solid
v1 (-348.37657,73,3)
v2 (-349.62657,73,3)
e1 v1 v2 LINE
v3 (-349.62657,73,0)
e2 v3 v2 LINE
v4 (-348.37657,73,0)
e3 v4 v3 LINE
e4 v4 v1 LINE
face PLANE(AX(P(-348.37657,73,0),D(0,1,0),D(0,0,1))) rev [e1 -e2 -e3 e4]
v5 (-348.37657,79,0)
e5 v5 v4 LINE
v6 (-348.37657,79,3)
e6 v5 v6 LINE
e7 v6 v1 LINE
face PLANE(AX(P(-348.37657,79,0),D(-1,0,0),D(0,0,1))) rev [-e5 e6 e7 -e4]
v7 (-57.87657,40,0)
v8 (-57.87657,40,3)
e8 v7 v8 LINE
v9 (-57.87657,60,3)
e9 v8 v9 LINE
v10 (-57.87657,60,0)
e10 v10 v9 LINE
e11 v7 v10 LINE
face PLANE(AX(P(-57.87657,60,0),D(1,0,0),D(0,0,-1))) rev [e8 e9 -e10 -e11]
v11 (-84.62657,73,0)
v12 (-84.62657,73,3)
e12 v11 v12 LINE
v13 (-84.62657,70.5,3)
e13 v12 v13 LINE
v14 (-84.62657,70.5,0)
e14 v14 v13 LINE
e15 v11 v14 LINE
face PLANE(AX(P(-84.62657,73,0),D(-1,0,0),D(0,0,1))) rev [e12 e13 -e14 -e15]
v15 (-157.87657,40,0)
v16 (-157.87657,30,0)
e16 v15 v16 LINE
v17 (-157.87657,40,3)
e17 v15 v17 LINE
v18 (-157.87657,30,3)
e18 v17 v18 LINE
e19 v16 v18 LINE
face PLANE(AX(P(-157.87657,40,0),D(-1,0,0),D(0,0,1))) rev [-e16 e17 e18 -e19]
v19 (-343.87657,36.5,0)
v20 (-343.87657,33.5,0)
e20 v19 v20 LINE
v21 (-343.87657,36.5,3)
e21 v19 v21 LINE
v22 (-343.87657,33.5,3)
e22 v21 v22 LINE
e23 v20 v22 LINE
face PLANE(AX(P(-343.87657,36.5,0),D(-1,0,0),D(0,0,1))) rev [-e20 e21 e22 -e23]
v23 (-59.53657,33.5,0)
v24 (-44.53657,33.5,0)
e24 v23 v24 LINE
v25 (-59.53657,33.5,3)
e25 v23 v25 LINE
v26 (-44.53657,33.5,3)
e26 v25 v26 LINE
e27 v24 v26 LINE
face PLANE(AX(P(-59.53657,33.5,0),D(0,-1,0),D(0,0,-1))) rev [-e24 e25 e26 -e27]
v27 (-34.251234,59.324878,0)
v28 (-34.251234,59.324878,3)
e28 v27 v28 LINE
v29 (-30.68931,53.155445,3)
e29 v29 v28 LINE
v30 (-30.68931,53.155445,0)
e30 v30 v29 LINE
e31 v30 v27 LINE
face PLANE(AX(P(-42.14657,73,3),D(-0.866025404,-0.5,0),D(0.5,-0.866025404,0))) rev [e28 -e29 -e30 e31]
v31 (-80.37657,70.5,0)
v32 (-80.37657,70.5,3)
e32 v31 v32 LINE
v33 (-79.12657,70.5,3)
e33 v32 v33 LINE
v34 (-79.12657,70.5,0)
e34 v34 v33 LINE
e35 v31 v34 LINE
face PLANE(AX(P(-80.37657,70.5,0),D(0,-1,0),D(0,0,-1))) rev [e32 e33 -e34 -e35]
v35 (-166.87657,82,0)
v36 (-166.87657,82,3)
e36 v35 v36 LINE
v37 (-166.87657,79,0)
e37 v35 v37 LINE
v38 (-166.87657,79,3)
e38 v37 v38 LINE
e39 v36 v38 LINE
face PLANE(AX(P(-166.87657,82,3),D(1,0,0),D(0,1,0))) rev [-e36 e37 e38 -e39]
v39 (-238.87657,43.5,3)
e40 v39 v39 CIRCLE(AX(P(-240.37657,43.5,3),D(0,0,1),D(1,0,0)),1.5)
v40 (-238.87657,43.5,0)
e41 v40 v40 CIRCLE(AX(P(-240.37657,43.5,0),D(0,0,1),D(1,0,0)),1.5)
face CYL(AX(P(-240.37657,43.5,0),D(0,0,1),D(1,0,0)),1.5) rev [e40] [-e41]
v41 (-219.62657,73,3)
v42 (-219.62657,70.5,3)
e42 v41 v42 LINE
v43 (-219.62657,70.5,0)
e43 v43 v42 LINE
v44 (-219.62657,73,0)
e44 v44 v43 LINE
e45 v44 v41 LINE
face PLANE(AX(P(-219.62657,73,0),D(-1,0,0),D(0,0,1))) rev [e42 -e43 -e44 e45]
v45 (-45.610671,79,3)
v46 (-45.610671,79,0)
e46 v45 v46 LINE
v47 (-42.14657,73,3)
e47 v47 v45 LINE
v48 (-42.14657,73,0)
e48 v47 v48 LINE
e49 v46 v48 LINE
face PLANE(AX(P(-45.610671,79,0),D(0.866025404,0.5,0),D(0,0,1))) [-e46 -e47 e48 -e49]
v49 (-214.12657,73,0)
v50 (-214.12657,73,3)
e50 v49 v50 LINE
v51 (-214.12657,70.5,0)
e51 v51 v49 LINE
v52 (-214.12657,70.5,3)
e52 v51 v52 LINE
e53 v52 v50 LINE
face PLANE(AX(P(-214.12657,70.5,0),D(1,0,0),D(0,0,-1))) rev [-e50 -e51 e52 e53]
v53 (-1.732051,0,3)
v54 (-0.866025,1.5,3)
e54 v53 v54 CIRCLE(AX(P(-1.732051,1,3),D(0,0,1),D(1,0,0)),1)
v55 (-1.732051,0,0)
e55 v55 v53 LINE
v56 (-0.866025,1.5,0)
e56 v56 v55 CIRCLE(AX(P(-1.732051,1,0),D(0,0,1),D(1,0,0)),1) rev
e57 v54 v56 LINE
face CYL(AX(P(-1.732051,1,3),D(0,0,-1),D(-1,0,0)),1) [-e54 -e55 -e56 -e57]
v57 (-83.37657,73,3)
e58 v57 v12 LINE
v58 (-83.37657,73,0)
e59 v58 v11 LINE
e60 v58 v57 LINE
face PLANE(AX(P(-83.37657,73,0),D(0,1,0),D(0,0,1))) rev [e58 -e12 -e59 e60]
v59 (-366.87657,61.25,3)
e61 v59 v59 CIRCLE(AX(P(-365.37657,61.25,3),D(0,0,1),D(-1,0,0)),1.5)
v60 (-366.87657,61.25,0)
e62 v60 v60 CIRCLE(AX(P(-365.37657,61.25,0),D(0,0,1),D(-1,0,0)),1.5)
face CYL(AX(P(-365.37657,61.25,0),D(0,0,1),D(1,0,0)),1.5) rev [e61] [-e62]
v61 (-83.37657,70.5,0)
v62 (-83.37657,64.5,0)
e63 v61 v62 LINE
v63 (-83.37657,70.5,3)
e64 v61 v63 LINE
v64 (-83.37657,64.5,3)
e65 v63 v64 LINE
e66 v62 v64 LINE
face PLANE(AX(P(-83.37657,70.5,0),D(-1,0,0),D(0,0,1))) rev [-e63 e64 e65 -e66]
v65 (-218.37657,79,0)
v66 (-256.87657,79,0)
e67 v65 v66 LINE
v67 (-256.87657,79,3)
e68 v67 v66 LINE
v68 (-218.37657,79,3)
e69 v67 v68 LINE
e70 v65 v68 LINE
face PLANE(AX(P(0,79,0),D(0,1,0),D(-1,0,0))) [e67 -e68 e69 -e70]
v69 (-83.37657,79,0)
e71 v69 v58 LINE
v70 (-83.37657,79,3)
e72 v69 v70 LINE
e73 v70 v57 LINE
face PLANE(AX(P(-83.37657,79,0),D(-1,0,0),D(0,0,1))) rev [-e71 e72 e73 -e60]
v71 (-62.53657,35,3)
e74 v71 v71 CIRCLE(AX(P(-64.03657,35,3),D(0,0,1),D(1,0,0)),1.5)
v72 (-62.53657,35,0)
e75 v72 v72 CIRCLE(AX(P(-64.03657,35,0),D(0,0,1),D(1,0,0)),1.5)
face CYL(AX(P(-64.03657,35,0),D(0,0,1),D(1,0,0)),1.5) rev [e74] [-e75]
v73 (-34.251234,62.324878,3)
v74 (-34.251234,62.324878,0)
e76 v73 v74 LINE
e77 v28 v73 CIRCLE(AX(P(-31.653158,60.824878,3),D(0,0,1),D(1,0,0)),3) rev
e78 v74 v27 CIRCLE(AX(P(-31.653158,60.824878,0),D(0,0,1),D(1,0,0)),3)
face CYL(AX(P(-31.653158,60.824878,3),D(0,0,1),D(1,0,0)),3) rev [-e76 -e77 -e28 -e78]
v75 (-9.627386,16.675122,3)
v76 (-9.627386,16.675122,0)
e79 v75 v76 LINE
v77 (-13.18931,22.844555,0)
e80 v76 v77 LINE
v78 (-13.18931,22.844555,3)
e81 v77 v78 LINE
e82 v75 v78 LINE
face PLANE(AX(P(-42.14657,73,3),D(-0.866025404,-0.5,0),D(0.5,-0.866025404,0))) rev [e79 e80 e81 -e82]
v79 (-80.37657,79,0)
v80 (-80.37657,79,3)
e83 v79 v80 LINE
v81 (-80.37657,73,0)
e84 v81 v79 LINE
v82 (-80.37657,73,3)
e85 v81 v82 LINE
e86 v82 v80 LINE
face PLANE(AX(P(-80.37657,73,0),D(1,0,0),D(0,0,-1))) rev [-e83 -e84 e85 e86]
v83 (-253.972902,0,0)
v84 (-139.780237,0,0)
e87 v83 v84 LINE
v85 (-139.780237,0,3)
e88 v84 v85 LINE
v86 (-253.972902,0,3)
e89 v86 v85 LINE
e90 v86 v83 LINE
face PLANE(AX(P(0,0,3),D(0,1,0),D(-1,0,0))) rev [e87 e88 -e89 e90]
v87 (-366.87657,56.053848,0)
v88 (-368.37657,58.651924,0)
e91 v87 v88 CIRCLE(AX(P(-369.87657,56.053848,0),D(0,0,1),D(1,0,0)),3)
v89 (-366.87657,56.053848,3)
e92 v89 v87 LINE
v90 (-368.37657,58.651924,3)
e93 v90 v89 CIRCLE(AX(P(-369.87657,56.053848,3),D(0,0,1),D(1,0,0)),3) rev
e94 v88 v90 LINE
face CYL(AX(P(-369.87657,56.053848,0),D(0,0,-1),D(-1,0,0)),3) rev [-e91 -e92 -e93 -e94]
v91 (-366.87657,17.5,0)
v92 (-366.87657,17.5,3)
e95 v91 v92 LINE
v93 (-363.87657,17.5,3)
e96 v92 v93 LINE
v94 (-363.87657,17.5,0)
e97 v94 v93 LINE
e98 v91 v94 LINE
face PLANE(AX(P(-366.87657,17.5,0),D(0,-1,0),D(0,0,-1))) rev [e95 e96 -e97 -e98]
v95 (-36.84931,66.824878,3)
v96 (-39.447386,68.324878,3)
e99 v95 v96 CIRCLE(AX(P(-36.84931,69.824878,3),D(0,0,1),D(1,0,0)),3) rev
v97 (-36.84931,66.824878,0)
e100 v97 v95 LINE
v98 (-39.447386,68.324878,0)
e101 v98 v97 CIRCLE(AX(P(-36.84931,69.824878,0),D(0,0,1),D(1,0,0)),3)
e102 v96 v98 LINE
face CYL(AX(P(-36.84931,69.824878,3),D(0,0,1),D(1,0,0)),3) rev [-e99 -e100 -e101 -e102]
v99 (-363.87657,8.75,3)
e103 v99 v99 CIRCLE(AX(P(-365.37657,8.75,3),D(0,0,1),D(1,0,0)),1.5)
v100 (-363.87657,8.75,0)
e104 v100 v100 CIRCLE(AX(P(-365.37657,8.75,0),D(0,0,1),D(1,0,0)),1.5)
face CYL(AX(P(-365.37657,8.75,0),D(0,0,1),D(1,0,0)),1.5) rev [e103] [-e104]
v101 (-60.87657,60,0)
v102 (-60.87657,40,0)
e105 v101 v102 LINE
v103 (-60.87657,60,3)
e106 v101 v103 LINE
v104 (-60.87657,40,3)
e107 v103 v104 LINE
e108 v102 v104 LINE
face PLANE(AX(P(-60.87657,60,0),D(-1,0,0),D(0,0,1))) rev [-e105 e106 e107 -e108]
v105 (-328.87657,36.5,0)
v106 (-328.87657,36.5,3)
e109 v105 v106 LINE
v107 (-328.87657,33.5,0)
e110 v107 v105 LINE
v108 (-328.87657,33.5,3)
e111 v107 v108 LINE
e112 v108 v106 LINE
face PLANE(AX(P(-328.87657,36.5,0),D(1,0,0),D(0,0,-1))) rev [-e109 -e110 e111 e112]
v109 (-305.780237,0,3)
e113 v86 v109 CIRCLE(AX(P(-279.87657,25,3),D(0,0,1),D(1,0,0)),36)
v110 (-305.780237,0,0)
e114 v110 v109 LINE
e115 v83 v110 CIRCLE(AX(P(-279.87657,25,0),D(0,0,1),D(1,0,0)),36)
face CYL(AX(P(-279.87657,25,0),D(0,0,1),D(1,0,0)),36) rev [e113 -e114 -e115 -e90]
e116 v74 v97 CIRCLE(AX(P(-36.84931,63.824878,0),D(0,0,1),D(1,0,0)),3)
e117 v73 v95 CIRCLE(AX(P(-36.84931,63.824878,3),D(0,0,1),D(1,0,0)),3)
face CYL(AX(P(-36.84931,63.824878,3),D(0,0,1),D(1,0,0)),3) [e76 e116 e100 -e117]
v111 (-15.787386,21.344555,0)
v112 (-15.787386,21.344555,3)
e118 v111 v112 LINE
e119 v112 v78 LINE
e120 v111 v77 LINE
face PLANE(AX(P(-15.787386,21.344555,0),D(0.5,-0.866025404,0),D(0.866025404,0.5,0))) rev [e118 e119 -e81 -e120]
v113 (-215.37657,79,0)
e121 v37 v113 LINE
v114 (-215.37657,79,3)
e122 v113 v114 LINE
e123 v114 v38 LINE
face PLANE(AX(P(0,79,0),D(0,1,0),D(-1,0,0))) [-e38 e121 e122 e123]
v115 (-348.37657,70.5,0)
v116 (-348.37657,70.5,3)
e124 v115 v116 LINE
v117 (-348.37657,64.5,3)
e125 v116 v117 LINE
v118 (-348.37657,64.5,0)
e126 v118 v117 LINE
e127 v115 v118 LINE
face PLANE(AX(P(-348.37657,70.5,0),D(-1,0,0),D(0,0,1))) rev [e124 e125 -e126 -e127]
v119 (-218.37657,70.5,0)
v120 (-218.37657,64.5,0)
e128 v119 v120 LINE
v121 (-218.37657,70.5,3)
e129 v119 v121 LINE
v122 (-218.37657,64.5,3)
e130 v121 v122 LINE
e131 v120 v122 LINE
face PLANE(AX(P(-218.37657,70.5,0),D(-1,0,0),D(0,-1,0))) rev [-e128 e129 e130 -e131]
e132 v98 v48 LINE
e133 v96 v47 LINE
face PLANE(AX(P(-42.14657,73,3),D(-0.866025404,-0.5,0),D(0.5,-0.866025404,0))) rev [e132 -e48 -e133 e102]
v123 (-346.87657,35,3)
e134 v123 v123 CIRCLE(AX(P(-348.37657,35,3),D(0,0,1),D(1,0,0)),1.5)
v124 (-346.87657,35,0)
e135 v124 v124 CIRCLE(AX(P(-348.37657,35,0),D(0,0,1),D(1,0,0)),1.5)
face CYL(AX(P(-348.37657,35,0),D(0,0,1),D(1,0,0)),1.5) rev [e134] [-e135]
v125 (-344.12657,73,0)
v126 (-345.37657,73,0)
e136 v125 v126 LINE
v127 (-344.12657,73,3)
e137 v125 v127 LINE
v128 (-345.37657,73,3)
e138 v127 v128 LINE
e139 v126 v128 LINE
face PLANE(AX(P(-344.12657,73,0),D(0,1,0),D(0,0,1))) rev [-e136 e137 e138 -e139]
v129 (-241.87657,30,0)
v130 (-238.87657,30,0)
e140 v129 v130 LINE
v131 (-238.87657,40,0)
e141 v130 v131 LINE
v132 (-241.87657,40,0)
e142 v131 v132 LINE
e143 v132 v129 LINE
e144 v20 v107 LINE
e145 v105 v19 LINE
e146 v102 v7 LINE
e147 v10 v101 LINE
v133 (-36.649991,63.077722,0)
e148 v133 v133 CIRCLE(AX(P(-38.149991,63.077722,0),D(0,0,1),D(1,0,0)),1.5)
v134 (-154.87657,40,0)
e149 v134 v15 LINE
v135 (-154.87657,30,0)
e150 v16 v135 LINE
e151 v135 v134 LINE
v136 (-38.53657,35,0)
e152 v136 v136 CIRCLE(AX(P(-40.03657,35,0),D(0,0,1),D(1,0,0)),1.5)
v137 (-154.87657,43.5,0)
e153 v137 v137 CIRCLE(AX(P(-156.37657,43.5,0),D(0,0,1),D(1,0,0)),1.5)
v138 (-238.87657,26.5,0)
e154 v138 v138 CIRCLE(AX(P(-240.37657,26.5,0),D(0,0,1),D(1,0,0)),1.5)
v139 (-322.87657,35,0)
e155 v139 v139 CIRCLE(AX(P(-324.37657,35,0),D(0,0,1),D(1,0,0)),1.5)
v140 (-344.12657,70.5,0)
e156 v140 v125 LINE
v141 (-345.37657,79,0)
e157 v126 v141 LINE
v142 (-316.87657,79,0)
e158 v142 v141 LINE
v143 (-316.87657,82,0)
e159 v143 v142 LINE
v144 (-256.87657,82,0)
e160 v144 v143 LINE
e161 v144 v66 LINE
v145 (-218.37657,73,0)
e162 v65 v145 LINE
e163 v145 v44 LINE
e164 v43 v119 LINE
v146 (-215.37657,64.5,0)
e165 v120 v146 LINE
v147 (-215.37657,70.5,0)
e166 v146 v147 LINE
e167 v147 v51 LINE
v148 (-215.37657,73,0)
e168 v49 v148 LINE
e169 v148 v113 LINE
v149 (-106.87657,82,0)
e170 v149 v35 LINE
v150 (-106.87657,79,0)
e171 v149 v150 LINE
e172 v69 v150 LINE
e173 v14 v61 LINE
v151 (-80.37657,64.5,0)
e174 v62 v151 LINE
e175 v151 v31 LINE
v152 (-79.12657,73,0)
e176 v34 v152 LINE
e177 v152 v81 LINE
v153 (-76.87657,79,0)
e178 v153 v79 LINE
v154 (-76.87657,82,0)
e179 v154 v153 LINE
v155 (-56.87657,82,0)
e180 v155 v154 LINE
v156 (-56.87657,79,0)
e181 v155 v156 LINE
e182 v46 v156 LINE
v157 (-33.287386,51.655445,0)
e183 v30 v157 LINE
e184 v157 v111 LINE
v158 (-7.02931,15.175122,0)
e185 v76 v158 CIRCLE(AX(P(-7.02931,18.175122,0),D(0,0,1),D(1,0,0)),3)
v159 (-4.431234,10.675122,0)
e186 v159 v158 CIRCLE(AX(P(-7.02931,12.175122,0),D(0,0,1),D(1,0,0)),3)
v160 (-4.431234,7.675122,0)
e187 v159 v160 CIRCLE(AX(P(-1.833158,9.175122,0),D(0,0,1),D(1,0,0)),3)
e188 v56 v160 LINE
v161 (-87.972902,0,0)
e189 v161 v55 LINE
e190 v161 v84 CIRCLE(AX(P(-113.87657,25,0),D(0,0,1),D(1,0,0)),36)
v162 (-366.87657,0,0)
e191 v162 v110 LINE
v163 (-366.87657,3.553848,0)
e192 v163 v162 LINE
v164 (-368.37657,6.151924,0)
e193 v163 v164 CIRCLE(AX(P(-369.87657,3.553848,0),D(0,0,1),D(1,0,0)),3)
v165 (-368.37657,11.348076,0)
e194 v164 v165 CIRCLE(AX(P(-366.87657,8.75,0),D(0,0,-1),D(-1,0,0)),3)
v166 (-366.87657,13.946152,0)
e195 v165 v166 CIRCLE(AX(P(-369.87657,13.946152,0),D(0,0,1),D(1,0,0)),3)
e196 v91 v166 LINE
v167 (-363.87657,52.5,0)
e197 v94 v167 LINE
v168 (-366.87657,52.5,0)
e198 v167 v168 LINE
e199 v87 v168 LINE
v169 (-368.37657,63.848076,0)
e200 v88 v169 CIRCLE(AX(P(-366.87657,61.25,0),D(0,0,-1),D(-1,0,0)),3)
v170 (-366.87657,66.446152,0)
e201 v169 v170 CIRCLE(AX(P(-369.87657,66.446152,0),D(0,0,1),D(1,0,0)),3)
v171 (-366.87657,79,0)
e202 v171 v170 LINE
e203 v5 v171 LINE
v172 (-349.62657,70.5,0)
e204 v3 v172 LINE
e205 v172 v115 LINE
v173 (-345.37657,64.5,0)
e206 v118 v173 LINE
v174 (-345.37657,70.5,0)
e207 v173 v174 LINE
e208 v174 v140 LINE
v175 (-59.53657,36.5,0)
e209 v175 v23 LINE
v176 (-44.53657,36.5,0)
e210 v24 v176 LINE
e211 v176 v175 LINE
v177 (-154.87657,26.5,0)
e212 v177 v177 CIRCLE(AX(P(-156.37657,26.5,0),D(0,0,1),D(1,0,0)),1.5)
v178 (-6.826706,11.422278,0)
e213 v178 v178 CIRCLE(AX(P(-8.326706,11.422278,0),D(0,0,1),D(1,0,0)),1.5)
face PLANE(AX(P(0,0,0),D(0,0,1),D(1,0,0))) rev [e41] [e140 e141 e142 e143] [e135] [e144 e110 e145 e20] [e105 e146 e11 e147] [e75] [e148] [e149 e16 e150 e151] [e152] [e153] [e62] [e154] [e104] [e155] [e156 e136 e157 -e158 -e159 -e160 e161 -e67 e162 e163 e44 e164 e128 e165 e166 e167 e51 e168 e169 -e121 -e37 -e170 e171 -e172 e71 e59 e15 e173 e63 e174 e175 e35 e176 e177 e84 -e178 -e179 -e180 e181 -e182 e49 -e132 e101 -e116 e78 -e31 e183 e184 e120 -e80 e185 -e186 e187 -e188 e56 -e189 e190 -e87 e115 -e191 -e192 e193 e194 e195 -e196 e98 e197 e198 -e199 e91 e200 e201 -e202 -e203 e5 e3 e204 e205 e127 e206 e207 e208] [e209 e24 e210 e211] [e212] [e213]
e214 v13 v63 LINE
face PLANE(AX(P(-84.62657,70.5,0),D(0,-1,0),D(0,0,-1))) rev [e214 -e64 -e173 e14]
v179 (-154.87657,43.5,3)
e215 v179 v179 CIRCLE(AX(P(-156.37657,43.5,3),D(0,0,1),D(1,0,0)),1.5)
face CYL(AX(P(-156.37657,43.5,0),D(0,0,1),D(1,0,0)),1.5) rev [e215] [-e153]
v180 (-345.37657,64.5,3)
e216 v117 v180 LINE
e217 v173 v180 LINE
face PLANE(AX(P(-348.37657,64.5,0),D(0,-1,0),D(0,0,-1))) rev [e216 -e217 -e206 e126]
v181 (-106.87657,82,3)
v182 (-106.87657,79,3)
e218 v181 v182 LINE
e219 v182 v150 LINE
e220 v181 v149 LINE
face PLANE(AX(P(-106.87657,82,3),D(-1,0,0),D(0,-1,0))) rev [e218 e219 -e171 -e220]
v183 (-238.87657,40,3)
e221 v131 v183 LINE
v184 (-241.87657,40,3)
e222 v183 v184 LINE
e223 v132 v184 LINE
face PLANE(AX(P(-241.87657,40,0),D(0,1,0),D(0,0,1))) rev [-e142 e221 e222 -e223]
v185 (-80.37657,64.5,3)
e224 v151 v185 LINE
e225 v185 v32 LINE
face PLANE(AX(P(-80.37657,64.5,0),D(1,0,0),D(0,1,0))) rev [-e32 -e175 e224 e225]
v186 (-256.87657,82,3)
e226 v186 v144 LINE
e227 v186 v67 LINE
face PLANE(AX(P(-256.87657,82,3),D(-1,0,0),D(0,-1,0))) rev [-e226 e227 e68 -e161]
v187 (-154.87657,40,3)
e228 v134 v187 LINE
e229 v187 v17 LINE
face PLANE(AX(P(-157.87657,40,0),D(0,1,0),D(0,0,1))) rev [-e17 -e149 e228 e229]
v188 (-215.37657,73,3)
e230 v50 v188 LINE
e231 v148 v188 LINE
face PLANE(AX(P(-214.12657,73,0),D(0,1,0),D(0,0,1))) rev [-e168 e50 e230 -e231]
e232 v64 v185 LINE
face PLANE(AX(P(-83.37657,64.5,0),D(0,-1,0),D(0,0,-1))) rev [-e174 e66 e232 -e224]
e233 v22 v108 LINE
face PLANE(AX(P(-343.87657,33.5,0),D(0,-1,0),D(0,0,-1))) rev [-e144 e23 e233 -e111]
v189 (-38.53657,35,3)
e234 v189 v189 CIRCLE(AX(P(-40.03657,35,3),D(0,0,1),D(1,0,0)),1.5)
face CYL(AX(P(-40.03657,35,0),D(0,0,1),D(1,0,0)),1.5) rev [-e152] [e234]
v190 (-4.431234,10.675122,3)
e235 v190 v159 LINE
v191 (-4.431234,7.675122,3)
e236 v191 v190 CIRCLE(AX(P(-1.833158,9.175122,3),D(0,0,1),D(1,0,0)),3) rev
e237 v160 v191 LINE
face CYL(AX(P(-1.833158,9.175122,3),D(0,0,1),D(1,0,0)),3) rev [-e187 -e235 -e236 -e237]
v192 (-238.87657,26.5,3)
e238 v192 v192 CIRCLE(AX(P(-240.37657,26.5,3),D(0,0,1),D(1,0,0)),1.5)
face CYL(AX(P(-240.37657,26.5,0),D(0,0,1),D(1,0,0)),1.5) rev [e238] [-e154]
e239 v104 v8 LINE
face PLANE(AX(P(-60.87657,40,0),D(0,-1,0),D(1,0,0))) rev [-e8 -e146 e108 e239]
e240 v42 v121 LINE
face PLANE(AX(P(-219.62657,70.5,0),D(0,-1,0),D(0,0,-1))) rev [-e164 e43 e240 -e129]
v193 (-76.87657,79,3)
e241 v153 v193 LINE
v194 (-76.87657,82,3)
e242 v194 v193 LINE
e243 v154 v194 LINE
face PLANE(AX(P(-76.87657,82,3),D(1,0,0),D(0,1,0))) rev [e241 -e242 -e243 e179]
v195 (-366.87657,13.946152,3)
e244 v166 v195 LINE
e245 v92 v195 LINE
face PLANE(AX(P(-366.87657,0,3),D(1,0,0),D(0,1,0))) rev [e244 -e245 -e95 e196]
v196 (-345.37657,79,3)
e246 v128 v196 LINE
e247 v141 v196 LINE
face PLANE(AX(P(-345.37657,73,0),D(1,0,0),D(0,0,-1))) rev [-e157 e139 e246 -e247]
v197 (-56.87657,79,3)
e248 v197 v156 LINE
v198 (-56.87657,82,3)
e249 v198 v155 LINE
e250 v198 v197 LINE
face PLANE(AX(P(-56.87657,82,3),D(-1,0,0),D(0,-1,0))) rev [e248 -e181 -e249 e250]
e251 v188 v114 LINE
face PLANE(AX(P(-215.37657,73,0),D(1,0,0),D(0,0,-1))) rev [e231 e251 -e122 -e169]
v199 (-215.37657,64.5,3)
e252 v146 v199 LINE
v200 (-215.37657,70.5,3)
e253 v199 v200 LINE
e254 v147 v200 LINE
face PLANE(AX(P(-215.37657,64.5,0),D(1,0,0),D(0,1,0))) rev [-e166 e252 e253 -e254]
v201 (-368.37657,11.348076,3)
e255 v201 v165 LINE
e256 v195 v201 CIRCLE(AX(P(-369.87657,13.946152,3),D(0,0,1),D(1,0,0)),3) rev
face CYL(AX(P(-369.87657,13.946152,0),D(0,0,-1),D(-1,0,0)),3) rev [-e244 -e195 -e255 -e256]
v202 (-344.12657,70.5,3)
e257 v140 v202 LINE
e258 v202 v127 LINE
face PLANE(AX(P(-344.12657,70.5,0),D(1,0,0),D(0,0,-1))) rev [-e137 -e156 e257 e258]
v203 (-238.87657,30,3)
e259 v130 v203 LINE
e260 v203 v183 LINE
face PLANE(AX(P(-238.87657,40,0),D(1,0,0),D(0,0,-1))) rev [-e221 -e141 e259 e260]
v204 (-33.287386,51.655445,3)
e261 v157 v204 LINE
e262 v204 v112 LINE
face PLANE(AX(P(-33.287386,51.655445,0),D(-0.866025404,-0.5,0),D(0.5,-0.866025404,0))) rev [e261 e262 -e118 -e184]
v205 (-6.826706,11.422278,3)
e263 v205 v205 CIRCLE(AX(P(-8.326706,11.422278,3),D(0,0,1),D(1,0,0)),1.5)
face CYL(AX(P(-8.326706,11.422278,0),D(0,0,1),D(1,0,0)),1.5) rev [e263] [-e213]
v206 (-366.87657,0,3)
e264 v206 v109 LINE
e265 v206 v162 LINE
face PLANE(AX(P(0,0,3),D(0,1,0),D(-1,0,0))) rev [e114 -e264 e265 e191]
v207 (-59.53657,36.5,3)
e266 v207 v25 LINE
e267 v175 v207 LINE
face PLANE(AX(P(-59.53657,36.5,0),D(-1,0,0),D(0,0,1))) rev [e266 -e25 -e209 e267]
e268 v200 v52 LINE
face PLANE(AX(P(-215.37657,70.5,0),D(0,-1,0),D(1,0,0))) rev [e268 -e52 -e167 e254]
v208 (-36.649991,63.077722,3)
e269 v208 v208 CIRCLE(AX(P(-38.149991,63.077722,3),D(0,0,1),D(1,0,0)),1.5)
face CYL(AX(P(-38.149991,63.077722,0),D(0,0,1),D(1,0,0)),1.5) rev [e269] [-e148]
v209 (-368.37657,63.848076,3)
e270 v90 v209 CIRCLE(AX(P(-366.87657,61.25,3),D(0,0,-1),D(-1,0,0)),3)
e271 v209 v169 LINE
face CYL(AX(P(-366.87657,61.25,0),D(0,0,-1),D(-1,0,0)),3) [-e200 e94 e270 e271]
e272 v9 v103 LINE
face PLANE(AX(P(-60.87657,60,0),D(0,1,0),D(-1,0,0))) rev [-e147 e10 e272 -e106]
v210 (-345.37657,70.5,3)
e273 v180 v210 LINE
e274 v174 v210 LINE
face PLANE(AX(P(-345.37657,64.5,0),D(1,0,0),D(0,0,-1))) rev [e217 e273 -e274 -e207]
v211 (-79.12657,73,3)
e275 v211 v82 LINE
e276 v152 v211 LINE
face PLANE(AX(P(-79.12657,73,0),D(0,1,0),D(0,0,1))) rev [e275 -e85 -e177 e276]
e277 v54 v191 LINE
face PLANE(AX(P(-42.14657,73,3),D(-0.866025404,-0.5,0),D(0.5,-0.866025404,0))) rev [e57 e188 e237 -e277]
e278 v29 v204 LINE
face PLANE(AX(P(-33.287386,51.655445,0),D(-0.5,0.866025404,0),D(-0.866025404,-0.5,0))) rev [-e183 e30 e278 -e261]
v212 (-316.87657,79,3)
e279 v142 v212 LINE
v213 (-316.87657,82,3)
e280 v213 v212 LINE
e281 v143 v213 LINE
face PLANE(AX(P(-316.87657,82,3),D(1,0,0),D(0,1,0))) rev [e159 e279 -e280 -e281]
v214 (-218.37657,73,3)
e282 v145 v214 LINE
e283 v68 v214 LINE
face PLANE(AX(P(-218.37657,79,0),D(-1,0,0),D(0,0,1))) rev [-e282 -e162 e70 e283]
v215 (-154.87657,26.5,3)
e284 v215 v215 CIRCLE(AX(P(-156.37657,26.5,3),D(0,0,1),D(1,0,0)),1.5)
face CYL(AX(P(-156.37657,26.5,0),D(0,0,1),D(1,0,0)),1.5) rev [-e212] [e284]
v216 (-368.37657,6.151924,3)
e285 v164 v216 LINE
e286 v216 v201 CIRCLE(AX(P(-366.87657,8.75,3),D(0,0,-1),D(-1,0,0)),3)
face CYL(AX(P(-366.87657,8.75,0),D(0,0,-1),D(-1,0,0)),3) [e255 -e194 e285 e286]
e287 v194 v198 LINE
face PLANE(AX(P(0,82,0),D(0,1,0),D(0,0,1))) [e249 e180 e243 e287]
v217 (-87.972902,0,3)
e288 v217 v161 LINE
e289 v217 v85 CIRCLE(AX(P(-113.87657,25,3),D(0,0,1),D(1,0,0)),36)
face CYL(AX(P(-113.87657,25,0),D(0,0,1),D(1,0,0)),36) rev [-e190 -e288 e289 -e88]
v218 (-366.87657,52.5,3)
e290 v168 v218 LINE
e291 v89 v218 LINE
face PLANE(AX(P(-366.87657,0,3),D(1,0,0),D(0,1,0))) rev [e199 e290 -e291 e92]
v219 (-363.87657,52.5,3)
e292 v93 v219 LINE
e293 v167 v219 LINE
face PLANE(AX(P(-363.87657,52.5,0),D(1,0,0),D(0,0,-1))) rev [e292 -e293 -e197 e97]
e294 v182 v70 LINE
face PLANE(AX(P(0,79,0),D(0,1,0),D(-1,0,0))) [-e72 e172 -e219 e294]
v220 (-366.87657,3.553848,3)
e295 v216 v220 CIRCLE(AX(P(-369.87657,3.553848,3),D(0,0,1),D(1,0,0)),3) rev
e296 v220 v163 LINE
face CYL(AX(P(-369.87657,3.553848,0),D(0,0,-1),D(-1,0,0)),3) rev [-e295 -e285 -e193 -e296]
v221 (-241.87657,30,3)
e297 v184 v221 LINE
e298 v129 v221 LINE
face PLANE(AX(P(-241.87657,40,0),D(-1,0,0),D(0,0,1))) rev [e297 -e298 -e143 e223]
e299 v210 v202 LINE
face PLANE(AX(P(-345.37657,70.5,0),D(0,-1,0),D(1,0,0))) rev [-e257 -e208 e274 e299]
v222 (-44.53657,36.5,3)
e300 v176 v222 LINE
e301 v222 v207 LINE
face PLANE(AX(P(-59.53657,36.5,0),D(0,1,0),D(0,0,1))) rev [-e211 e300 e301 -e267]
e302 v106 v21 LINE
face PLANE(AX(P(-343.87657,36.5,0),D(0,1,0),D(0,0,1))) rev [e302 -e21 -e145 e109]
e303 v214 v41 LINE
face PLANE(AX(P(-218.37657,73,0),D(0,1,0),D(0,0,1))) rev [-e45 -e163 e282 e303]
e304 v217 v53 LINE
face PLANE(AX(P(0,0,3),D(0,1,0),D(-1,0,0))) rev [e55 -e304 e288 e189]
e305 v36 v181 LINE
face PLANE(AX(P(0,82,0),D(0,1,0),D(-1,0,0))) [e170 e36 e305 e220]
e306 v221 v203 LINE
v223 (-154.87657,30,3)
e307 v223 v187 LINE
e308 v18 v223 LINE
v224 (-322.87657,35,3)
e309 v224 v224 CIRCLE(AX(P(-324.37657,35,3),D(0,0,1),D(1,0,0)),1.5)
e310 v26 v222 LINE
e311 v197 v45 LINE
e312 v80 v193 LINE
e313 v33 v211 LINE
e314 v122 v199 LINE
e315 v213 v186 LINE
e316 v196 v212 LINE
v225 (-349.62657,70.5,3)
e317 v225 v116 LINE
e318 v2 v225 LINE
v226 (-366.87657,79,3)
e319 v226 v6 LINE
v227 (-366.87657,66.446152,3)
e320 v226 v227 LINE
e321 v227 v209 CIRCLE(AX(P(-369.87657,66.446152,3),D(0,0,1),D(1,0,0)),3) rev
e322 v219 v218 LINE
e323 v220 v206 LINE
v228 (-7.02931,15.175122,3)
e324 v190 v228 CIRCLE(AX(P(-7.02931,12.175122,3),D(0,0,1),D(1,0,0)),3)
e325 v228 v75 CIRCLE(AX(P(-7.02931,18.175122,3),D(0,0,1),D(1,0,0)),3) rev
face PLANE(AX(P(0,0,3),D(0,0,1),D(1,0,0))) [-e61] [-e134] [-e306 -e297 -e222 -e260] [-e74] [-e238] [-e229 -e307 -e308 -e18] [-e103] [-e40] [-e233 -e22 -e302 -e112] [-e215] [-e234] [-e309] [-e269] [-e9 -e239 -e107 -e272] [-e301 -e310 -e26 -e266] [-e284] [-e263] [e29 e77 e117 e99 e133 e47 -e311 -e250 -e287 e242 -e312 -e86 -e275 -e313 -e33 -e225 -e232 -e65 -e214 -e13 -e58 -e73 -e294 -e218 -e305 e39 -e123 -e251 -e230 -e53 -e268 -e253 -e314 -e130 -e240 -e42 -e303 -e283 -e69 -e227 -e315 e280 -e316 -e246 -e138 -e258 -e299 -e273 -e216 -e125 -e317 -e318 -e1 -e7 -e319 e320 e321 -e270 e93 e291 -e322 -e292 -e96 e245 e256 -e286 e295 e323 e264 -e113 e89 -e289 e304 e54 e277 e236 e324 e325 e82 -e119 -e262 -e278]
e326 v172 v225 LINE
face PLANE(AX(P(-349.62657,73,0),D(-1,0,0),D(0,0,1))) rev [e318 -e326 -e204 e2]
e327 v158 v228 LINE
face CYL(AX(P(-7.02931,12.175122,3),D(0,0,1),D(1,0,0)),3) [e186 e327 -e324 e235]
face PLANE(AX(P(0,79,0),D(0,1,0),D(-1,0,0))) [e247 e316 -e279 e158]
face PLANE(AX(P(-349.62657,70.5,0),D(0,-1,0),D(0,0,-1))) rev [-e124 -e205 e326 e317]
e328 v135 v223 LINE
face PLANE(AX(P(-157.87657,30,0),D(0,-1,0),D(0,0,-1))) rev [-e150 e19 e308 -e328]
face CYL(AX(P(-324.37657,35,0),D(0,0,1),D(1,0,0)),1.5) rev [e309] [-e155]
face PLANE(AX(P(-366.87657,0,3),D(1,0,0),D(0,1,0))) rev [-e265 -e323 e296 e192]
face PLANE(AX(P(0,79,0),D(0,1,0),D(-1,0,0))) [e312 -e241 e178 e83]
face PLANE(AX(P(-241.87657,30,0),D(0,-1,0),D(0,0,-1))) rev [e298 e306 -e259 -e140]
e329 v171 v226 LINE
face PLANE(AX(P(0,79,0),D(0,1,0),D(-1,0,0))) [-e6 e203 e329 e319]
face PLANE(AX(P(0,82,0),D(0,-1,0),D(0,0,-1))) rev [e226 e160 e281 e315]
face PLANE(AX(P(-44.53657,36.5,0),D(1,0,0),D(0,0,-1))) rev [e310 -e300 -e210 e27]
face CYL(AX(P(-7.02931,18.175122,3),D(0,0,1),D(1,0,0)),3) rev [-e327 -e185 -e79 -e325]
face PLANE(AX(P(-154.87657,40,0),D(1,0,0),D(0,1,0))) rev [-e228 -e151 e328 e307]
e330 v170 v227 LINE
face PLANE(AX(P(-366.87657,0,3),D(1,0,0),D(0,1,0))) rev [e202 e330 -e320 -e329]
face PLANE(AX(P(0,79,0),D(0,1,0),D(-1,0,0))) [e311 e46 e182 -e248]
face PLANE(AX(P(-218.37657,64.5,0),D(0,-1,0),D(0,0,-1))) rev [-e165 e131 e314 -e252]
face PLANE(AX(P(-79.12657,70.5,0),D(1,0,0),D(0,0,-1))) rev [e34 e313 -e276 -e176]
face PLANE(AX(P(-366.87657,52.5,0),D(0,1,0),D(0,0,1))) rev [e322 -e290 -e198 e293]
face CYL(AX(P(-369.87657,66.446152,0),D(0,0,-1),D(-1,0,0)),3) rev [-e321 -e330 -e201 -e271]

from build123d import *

# Parameters (mm, degrees)
EXTRUDE_1_DEPTH      = 3
SKETCH_2_W           = 3
SKETCH_2_H           = 35
CUT_EXTRUDE_1_DEPTH  = 3
CUT_EXTRUDE_2_DEPTH  = 3
SKETCH_4_W           = 3
SKETCH_4_H           = 10
CUT_EXTRUDE_3_DEPTH  = 3
SKETCH_5_W           = 15
SKETCH_5_H           = 3
CUT_EXTRUDE_4_DEPTH  = 3
SKETCH_6_W           = 324.73
SKETCH_6_H           = 3
EXTRUDE_2_DEPTH      = 6
SKETCH_8_W           = 3
SKETCH_8_H           = 3
SKETCH_9_W           = 3
SKETCH_9_H           = 3
SKETCH_7_R           = 1.5
CUT_EXTRUDE_6_DEPTH  = 3
FILLET_1_R           = 3
SKETCH_14_R          = 1.5
CUT_EXTRUDE_9_DEPTH  = 3
SKETCH_15_R          = 1.5
CUT_EXTRUDE_10_DEPTH = 3
SKETCH_16_W          = 3
SKETCH_16_H          = 3
SKETCH_17_W          = 3
SKETCH_17_H          = 3
SKETCH_18_R          = 1.5
CUT_EXTRUDE_11_DEPTH = 3
FILLET_2_R           = 3
CHAMFER_1_SIZE2      = 3.464101615
CHAMFER_1_SIZE       = 6
SKETCH_19_R          = 36
CUT_EXTRUDE_12_DEPTH = 3
SKETCH_24_W          = 20
SKETCH_24_H          = 3
SKETCH_24_W_2        = 60
EXTRUDE_3_DEPTH      = 3
CUT_EXTRUDE_13_DEPTH = 3
FILLET_3_R           = 1
SKETCH_26_W          = 3
SKETCH_26_H          = 20
CUT_EXTRUDE_14_DEPTH = 3


with BuildPart() as part:
    # Эскиз1 → Бобышка-Вытянуть1 (new body)
    with BuildSketch(Plane.XY):
        Polygon((-42.146569651, 73), (0, 0), (-366.876569651, 0), (-366.876569651, 73), align=None)
    extrude(amount=EXTRUDE_1_DEPTH)

    # Эскиз2 → Вырез-Вытянуть1 (cut)
    with BuildSketch(Plane.XY.offset(3)):
        with Locations((-365.376569651, 35)):
            Rectangle(SKETCH_2_W, SKETCH_2_H)
    extrude(amount=-CUT_EXTRUDE_1_DEPTH, mode=Mode.SUBTRACT)

    # Эскиз3 → Вырез-Вытянуть2 (cut)
    with BuildSketch(Plane.XY.offset(3)):
        Polygon((-33.287386441, 51.655444566), (-30.689310229, 53.155444566), (-13.189310229, 22.844555434), (-15.787386441, 21.344555434), align=None)
    extrude(amount=-CUT_EXTRUDE_2_DEPTH, mode=Mode.SUBTRACT)

    # Эскиз4 → Вырез-Вытянуть3 (cut)
    with BuildSketch(Plane.XY.offset(3)):
        with Locations((-240.376569651, 35)):
            Rectangle(SKETCH_4_W, SKETCH_4_H)
        with Locations((-156.376569651, 35)):
            Rectangle(SKETCH_4_W, SKETCH_4_H)
    extrude(amount=-CUT_EXTRUDE_3_DEPTH, mode=Mode.SUBTRACT)

    # Эскиз5 → Вырез-Вытянуть4 (cut)
    with BuildSketch(Plane.XY.offset(3)):
        with Locations((-336.376569651, 35)):
            Rectangle(SKETCH_5_W, SKETCH_5_H)
        with Locations((-52.036569651, 35)):
            Rectangle(SKETCH_5_W, SKETCH_5_H)
    extrude(amount=-CUT_EXTRUDE_4_DEPTH, mode=Mode.SUBTRACT)

    # Эскиз6 → Бобышка-Вытянуть2 (add)
    with BuildSketch(Plane(origin=(0, 73, 0), x_dir=(1, 0, 0), z_dir=(0, 1, 0))):
        with Locations((-204.511569651, -1.5)):
            Rectangle(SKETCH_6_W, SKETCH_6_H)
    extrude(amount=EXTRUDE_2_DEPTH)

    # Эскиз8 → Повернуть1 (revolve)
    with BuildSketch(Plane.ZY.offset(366.876569651)):
        with Locations((1.5, 7.25)):
            Rectangle(SKETCH_8_W, SKETCH_8_H)
    revolve(axis=Axis((-366.876569651, 8.75, 0), (0, 0, 1)))

    # Эскиз9 → Повернуть2 (revolve)
    with BuildSketch(Plane.ZY.offset(366.876569651)):
        with Locations((1.5, 59.75)):
            Rectangle(SKETCH_9_W, SKETCH_9_H)
    revolve(axis=Axis((-366.876569651, 61.25, 0), (0, 0, 1)))

    # Эскиз7 → Вырез-Вытянуть6 (cut)
    with BuildSketch(Plane.XY.offset(3)):
        with Locations((-365.376569651, 8.75)):
            Circle(SKETCH_7_R)
        with Locations(Location((-365.376569651, 61.25, 0), (0, 0, 180))):
            Circle(SKETCH_7_R)
    extrude(amount=-CUT_EXTRUDE_6_DEPTH, mode=Mode.SUBTRACT)

    # Скругление1
    fillet_1_edges = [part.edges().sort_by_distance(p)[0] for p in [
        (-366.876569651, 5.75, 1.5),
        (-366.876569651, 11.75, 1.5),
        (-366.876569651, 58.25, 1.5),
        (-366.876569651, 64.25, 1.5),
    ]]
    fillet(fillet_1_edges, radius=FILLET_1_R)

    # Эскиз14 → Вырез-Вытянуть9 (cut)
    with BuildSketch(Plane.XY.offset(3)):
        with Locations((-156.376569651, 43.5)):
            Circle(SKETCH_14_R)
        with Locations((-156.376569651, 26.5)):
            Circle(SKETCH_14_R)
        with Locations((-240.376569651, 26.5)):
            Circle(SKETCH_14_R)
        with Locations((-240.376569651, 43.5)):
            Circle(SKETCH_14_R)
    extrude(amount=-CUT_EXTRUDE_9_DEPTH, mode=Mode.SUBTRACT)

    # Эскиз15 → Вырез-Вытянуть10 (cut)
    with BuildSketch(Plane.XY.offset(3)):
        with Locations((-324.376569651, 35)):
            Circle(SKETCH_15_R)
        with Locations((-348.376569651, 35)):
            Circle(SKETCH_15_R)
        with Locations((-64.036569651, 35)):
            Circle(SKETCH_15_R)
        with Locations((-40.036569651, 35)):
            Circle(SKETCH_15_R)
    extrude(amount=-CUT_EXTRUDE_10_DEPTH, mode=Mode.SUBTRACT)

    # Эскиз16 → Повернуть3 (revolve)
    with BuildSketch(Plane(origin=(0, 0, 0), x_dir=(0, 0, -1), z_dir=(0.8660254037844265, 0.5000000000000212, 0))):
        with Locations((-1.5, 12.558620458)):
            Rectangle(SKETCH_16_W, SKETCH_16_H)
    revolve(axis=Axis((-7.029310229, 12.175122459, 3), (0, 0, -1)))

    # Эскиз17 → Повернуть4 (revolve)
    with BuildSketch(Plane(origin=(0, 0, 0), x_dir=(0, 0, -1), z_dir=(0.8660254037844265, 0.5000000000000212, 0))):
        with Locations((-1.5, 75.198620458)):
            Rectangle(SKETCH_17_W, SKETCH_17_H)
    revolve(axis=Axis((-36.849310229, 63.824877541, 3), (0, 0, -1)))

    # Эскиз18 → Вырез-Вытянуть11 (cut)
    with BuildSketch(Plane.XY.offset(3)):
        with Locations((-38.149990748, 63.077722283)):
            Circle(SKETCH_18_R)
        with Locations((-8.326705922, 11.422277717)):
            Circle(SKETCH_18_R)
    extrude(amount=-CUT_EXTRUDE_11_DEPTH, mode=Mode.SUBTRACT)

    # Скругление2
    fillet_2_edges = [part.edges().sort_by_distance(p)[0] for p in [
        (-5.529310229, 9.577046248, 1.5),
        (-8.529310229, 14.773198671, 1.5),
        (-35.349310229, 61.226801329, 1.5),
        (-38.349310229, 66.422953752, 1.5),
    ]]
    fillet(fillet_2_edges, radius=FILLET_2_R)

    # Фаска1
    chamfer_1_edges = [part.edges().sort_by_distance(p)[0] for p in [
        (-42.146569651, 79, 1.5),
    ]]
    chamfer_1_side = [part.faces().sort_by_distance(p)[0] for p in [
        (-42.146569651, 78.930717968, 1.5),
    ]]
    chamfer(chamfer_1_edges, length=CHAMFER_1_SIZE - 0.0001, length2=CHAMFER_1_SIZE2 - 0.0001, reference=chamfer_1_side[0])  # a hair under: the kernel refuses the full size

    # Эскиз19 → Вырез-Вытянуть12 (cut)
    with BuildSketch(Plane.XY.offset(3)):
        with Locations((-279.876569651, 25)):
            Circle(SKETCH_19_R)
        with Locations((-113.876569651, 25)):
            Circle(SKETCH_19_R)
    extrude(amount=-CUT_EXTRUDE_12_DEPTH, mode=Mode.SUBTRACT)

    # Эскиз24 → Бобышка-Вытянуть3 (add)
    with BuildSketch(Plane(origin=(0, 79, 0), x_dir=(1, 0, 0), z_dir=(0, 1, 0))):
        with Locations((-66.876569651, -1.5)):
            Rectangle(SKETCH_24_W, SKETCH_24_H)
        with Locations((-136.876569651, -1.5)):
            Rectangle(SKETCH_24_W_2, SKETCH_24_H)
        with Locations((-286.876569651, -1.5)):
            Rectangle(SKETCH_24_W_2, SKETCH_24_H)
    extrude(amount=EXTRUDE_3_DEPTH)

    # Эскиз25 → Вырез-Вытянуть13 (cut)
    with BuildSketch(Plane.XY.offset(3)):
        Polygon((-348.376569651, 79), (-348.376569651, 73), (-349.626569651, 73), (-349.626569651, 70.5), (-348.376569651, 70.5), (-348.376569651, 64.5), (-345.376569651, 64.5), (-345.376569651, 70.5), (-344.126569651, 70.5), (-344.126569651, 73), (-345.376569651, 73), (-345.376569651, 79), align=None)
        Polygon((-218.376569651, 79), (-218.376569651, 73), (-219.626569651, 73), (-219.626569651, 70.5), (-218.376569651, 70.5), (-218.376569651, 64.5), (-215.376569651, 64.5), (-215.376569651, 70.5), (-214.126569651, 70.5), (-214.126569651, 73), (-215.376569651, 73), (-215.376569651, 79), align=None)
        Polygon((-83.376569651, 79), (-83.376569651, 73), (-84.626569651, 73), (-84.626569651, 70.5), (-83.376569651, 70.5), (-83.376569651, 64.5), (-80.376569651, 64.5), (-80.376569651, 70.5), (-79.126569651, 70.5), (-79.126569651, 73), (-80.376569651, 73), (-80.376569651, 79), align=None)
    extrude(amount=-CUT_EXTRUDE_13_DEPTH, mode=Mode.SUBTRACT)

    # Скругление3
    fillet_3_edges = [part.edges().sort_by_distance(p)[0] for p in [
        (0, 0, 1.5),
    ]]
    fillet(fillet_3_edges, radius=FILLET_3_R)

    # Эскиз26 → Вырез-Вытянуть14 (cut)
    with BuildSketch(Plane.XY.offset(3)):
        with Locations((-59.376569651, 50)):
            Rectangle(SKETCH_26_W, SKETCH_26_H)
    extrude(amount=-CUT_EXTRUDE_14_DEPTH, mode=Mode.SUBTRACT)


solid = part.part
